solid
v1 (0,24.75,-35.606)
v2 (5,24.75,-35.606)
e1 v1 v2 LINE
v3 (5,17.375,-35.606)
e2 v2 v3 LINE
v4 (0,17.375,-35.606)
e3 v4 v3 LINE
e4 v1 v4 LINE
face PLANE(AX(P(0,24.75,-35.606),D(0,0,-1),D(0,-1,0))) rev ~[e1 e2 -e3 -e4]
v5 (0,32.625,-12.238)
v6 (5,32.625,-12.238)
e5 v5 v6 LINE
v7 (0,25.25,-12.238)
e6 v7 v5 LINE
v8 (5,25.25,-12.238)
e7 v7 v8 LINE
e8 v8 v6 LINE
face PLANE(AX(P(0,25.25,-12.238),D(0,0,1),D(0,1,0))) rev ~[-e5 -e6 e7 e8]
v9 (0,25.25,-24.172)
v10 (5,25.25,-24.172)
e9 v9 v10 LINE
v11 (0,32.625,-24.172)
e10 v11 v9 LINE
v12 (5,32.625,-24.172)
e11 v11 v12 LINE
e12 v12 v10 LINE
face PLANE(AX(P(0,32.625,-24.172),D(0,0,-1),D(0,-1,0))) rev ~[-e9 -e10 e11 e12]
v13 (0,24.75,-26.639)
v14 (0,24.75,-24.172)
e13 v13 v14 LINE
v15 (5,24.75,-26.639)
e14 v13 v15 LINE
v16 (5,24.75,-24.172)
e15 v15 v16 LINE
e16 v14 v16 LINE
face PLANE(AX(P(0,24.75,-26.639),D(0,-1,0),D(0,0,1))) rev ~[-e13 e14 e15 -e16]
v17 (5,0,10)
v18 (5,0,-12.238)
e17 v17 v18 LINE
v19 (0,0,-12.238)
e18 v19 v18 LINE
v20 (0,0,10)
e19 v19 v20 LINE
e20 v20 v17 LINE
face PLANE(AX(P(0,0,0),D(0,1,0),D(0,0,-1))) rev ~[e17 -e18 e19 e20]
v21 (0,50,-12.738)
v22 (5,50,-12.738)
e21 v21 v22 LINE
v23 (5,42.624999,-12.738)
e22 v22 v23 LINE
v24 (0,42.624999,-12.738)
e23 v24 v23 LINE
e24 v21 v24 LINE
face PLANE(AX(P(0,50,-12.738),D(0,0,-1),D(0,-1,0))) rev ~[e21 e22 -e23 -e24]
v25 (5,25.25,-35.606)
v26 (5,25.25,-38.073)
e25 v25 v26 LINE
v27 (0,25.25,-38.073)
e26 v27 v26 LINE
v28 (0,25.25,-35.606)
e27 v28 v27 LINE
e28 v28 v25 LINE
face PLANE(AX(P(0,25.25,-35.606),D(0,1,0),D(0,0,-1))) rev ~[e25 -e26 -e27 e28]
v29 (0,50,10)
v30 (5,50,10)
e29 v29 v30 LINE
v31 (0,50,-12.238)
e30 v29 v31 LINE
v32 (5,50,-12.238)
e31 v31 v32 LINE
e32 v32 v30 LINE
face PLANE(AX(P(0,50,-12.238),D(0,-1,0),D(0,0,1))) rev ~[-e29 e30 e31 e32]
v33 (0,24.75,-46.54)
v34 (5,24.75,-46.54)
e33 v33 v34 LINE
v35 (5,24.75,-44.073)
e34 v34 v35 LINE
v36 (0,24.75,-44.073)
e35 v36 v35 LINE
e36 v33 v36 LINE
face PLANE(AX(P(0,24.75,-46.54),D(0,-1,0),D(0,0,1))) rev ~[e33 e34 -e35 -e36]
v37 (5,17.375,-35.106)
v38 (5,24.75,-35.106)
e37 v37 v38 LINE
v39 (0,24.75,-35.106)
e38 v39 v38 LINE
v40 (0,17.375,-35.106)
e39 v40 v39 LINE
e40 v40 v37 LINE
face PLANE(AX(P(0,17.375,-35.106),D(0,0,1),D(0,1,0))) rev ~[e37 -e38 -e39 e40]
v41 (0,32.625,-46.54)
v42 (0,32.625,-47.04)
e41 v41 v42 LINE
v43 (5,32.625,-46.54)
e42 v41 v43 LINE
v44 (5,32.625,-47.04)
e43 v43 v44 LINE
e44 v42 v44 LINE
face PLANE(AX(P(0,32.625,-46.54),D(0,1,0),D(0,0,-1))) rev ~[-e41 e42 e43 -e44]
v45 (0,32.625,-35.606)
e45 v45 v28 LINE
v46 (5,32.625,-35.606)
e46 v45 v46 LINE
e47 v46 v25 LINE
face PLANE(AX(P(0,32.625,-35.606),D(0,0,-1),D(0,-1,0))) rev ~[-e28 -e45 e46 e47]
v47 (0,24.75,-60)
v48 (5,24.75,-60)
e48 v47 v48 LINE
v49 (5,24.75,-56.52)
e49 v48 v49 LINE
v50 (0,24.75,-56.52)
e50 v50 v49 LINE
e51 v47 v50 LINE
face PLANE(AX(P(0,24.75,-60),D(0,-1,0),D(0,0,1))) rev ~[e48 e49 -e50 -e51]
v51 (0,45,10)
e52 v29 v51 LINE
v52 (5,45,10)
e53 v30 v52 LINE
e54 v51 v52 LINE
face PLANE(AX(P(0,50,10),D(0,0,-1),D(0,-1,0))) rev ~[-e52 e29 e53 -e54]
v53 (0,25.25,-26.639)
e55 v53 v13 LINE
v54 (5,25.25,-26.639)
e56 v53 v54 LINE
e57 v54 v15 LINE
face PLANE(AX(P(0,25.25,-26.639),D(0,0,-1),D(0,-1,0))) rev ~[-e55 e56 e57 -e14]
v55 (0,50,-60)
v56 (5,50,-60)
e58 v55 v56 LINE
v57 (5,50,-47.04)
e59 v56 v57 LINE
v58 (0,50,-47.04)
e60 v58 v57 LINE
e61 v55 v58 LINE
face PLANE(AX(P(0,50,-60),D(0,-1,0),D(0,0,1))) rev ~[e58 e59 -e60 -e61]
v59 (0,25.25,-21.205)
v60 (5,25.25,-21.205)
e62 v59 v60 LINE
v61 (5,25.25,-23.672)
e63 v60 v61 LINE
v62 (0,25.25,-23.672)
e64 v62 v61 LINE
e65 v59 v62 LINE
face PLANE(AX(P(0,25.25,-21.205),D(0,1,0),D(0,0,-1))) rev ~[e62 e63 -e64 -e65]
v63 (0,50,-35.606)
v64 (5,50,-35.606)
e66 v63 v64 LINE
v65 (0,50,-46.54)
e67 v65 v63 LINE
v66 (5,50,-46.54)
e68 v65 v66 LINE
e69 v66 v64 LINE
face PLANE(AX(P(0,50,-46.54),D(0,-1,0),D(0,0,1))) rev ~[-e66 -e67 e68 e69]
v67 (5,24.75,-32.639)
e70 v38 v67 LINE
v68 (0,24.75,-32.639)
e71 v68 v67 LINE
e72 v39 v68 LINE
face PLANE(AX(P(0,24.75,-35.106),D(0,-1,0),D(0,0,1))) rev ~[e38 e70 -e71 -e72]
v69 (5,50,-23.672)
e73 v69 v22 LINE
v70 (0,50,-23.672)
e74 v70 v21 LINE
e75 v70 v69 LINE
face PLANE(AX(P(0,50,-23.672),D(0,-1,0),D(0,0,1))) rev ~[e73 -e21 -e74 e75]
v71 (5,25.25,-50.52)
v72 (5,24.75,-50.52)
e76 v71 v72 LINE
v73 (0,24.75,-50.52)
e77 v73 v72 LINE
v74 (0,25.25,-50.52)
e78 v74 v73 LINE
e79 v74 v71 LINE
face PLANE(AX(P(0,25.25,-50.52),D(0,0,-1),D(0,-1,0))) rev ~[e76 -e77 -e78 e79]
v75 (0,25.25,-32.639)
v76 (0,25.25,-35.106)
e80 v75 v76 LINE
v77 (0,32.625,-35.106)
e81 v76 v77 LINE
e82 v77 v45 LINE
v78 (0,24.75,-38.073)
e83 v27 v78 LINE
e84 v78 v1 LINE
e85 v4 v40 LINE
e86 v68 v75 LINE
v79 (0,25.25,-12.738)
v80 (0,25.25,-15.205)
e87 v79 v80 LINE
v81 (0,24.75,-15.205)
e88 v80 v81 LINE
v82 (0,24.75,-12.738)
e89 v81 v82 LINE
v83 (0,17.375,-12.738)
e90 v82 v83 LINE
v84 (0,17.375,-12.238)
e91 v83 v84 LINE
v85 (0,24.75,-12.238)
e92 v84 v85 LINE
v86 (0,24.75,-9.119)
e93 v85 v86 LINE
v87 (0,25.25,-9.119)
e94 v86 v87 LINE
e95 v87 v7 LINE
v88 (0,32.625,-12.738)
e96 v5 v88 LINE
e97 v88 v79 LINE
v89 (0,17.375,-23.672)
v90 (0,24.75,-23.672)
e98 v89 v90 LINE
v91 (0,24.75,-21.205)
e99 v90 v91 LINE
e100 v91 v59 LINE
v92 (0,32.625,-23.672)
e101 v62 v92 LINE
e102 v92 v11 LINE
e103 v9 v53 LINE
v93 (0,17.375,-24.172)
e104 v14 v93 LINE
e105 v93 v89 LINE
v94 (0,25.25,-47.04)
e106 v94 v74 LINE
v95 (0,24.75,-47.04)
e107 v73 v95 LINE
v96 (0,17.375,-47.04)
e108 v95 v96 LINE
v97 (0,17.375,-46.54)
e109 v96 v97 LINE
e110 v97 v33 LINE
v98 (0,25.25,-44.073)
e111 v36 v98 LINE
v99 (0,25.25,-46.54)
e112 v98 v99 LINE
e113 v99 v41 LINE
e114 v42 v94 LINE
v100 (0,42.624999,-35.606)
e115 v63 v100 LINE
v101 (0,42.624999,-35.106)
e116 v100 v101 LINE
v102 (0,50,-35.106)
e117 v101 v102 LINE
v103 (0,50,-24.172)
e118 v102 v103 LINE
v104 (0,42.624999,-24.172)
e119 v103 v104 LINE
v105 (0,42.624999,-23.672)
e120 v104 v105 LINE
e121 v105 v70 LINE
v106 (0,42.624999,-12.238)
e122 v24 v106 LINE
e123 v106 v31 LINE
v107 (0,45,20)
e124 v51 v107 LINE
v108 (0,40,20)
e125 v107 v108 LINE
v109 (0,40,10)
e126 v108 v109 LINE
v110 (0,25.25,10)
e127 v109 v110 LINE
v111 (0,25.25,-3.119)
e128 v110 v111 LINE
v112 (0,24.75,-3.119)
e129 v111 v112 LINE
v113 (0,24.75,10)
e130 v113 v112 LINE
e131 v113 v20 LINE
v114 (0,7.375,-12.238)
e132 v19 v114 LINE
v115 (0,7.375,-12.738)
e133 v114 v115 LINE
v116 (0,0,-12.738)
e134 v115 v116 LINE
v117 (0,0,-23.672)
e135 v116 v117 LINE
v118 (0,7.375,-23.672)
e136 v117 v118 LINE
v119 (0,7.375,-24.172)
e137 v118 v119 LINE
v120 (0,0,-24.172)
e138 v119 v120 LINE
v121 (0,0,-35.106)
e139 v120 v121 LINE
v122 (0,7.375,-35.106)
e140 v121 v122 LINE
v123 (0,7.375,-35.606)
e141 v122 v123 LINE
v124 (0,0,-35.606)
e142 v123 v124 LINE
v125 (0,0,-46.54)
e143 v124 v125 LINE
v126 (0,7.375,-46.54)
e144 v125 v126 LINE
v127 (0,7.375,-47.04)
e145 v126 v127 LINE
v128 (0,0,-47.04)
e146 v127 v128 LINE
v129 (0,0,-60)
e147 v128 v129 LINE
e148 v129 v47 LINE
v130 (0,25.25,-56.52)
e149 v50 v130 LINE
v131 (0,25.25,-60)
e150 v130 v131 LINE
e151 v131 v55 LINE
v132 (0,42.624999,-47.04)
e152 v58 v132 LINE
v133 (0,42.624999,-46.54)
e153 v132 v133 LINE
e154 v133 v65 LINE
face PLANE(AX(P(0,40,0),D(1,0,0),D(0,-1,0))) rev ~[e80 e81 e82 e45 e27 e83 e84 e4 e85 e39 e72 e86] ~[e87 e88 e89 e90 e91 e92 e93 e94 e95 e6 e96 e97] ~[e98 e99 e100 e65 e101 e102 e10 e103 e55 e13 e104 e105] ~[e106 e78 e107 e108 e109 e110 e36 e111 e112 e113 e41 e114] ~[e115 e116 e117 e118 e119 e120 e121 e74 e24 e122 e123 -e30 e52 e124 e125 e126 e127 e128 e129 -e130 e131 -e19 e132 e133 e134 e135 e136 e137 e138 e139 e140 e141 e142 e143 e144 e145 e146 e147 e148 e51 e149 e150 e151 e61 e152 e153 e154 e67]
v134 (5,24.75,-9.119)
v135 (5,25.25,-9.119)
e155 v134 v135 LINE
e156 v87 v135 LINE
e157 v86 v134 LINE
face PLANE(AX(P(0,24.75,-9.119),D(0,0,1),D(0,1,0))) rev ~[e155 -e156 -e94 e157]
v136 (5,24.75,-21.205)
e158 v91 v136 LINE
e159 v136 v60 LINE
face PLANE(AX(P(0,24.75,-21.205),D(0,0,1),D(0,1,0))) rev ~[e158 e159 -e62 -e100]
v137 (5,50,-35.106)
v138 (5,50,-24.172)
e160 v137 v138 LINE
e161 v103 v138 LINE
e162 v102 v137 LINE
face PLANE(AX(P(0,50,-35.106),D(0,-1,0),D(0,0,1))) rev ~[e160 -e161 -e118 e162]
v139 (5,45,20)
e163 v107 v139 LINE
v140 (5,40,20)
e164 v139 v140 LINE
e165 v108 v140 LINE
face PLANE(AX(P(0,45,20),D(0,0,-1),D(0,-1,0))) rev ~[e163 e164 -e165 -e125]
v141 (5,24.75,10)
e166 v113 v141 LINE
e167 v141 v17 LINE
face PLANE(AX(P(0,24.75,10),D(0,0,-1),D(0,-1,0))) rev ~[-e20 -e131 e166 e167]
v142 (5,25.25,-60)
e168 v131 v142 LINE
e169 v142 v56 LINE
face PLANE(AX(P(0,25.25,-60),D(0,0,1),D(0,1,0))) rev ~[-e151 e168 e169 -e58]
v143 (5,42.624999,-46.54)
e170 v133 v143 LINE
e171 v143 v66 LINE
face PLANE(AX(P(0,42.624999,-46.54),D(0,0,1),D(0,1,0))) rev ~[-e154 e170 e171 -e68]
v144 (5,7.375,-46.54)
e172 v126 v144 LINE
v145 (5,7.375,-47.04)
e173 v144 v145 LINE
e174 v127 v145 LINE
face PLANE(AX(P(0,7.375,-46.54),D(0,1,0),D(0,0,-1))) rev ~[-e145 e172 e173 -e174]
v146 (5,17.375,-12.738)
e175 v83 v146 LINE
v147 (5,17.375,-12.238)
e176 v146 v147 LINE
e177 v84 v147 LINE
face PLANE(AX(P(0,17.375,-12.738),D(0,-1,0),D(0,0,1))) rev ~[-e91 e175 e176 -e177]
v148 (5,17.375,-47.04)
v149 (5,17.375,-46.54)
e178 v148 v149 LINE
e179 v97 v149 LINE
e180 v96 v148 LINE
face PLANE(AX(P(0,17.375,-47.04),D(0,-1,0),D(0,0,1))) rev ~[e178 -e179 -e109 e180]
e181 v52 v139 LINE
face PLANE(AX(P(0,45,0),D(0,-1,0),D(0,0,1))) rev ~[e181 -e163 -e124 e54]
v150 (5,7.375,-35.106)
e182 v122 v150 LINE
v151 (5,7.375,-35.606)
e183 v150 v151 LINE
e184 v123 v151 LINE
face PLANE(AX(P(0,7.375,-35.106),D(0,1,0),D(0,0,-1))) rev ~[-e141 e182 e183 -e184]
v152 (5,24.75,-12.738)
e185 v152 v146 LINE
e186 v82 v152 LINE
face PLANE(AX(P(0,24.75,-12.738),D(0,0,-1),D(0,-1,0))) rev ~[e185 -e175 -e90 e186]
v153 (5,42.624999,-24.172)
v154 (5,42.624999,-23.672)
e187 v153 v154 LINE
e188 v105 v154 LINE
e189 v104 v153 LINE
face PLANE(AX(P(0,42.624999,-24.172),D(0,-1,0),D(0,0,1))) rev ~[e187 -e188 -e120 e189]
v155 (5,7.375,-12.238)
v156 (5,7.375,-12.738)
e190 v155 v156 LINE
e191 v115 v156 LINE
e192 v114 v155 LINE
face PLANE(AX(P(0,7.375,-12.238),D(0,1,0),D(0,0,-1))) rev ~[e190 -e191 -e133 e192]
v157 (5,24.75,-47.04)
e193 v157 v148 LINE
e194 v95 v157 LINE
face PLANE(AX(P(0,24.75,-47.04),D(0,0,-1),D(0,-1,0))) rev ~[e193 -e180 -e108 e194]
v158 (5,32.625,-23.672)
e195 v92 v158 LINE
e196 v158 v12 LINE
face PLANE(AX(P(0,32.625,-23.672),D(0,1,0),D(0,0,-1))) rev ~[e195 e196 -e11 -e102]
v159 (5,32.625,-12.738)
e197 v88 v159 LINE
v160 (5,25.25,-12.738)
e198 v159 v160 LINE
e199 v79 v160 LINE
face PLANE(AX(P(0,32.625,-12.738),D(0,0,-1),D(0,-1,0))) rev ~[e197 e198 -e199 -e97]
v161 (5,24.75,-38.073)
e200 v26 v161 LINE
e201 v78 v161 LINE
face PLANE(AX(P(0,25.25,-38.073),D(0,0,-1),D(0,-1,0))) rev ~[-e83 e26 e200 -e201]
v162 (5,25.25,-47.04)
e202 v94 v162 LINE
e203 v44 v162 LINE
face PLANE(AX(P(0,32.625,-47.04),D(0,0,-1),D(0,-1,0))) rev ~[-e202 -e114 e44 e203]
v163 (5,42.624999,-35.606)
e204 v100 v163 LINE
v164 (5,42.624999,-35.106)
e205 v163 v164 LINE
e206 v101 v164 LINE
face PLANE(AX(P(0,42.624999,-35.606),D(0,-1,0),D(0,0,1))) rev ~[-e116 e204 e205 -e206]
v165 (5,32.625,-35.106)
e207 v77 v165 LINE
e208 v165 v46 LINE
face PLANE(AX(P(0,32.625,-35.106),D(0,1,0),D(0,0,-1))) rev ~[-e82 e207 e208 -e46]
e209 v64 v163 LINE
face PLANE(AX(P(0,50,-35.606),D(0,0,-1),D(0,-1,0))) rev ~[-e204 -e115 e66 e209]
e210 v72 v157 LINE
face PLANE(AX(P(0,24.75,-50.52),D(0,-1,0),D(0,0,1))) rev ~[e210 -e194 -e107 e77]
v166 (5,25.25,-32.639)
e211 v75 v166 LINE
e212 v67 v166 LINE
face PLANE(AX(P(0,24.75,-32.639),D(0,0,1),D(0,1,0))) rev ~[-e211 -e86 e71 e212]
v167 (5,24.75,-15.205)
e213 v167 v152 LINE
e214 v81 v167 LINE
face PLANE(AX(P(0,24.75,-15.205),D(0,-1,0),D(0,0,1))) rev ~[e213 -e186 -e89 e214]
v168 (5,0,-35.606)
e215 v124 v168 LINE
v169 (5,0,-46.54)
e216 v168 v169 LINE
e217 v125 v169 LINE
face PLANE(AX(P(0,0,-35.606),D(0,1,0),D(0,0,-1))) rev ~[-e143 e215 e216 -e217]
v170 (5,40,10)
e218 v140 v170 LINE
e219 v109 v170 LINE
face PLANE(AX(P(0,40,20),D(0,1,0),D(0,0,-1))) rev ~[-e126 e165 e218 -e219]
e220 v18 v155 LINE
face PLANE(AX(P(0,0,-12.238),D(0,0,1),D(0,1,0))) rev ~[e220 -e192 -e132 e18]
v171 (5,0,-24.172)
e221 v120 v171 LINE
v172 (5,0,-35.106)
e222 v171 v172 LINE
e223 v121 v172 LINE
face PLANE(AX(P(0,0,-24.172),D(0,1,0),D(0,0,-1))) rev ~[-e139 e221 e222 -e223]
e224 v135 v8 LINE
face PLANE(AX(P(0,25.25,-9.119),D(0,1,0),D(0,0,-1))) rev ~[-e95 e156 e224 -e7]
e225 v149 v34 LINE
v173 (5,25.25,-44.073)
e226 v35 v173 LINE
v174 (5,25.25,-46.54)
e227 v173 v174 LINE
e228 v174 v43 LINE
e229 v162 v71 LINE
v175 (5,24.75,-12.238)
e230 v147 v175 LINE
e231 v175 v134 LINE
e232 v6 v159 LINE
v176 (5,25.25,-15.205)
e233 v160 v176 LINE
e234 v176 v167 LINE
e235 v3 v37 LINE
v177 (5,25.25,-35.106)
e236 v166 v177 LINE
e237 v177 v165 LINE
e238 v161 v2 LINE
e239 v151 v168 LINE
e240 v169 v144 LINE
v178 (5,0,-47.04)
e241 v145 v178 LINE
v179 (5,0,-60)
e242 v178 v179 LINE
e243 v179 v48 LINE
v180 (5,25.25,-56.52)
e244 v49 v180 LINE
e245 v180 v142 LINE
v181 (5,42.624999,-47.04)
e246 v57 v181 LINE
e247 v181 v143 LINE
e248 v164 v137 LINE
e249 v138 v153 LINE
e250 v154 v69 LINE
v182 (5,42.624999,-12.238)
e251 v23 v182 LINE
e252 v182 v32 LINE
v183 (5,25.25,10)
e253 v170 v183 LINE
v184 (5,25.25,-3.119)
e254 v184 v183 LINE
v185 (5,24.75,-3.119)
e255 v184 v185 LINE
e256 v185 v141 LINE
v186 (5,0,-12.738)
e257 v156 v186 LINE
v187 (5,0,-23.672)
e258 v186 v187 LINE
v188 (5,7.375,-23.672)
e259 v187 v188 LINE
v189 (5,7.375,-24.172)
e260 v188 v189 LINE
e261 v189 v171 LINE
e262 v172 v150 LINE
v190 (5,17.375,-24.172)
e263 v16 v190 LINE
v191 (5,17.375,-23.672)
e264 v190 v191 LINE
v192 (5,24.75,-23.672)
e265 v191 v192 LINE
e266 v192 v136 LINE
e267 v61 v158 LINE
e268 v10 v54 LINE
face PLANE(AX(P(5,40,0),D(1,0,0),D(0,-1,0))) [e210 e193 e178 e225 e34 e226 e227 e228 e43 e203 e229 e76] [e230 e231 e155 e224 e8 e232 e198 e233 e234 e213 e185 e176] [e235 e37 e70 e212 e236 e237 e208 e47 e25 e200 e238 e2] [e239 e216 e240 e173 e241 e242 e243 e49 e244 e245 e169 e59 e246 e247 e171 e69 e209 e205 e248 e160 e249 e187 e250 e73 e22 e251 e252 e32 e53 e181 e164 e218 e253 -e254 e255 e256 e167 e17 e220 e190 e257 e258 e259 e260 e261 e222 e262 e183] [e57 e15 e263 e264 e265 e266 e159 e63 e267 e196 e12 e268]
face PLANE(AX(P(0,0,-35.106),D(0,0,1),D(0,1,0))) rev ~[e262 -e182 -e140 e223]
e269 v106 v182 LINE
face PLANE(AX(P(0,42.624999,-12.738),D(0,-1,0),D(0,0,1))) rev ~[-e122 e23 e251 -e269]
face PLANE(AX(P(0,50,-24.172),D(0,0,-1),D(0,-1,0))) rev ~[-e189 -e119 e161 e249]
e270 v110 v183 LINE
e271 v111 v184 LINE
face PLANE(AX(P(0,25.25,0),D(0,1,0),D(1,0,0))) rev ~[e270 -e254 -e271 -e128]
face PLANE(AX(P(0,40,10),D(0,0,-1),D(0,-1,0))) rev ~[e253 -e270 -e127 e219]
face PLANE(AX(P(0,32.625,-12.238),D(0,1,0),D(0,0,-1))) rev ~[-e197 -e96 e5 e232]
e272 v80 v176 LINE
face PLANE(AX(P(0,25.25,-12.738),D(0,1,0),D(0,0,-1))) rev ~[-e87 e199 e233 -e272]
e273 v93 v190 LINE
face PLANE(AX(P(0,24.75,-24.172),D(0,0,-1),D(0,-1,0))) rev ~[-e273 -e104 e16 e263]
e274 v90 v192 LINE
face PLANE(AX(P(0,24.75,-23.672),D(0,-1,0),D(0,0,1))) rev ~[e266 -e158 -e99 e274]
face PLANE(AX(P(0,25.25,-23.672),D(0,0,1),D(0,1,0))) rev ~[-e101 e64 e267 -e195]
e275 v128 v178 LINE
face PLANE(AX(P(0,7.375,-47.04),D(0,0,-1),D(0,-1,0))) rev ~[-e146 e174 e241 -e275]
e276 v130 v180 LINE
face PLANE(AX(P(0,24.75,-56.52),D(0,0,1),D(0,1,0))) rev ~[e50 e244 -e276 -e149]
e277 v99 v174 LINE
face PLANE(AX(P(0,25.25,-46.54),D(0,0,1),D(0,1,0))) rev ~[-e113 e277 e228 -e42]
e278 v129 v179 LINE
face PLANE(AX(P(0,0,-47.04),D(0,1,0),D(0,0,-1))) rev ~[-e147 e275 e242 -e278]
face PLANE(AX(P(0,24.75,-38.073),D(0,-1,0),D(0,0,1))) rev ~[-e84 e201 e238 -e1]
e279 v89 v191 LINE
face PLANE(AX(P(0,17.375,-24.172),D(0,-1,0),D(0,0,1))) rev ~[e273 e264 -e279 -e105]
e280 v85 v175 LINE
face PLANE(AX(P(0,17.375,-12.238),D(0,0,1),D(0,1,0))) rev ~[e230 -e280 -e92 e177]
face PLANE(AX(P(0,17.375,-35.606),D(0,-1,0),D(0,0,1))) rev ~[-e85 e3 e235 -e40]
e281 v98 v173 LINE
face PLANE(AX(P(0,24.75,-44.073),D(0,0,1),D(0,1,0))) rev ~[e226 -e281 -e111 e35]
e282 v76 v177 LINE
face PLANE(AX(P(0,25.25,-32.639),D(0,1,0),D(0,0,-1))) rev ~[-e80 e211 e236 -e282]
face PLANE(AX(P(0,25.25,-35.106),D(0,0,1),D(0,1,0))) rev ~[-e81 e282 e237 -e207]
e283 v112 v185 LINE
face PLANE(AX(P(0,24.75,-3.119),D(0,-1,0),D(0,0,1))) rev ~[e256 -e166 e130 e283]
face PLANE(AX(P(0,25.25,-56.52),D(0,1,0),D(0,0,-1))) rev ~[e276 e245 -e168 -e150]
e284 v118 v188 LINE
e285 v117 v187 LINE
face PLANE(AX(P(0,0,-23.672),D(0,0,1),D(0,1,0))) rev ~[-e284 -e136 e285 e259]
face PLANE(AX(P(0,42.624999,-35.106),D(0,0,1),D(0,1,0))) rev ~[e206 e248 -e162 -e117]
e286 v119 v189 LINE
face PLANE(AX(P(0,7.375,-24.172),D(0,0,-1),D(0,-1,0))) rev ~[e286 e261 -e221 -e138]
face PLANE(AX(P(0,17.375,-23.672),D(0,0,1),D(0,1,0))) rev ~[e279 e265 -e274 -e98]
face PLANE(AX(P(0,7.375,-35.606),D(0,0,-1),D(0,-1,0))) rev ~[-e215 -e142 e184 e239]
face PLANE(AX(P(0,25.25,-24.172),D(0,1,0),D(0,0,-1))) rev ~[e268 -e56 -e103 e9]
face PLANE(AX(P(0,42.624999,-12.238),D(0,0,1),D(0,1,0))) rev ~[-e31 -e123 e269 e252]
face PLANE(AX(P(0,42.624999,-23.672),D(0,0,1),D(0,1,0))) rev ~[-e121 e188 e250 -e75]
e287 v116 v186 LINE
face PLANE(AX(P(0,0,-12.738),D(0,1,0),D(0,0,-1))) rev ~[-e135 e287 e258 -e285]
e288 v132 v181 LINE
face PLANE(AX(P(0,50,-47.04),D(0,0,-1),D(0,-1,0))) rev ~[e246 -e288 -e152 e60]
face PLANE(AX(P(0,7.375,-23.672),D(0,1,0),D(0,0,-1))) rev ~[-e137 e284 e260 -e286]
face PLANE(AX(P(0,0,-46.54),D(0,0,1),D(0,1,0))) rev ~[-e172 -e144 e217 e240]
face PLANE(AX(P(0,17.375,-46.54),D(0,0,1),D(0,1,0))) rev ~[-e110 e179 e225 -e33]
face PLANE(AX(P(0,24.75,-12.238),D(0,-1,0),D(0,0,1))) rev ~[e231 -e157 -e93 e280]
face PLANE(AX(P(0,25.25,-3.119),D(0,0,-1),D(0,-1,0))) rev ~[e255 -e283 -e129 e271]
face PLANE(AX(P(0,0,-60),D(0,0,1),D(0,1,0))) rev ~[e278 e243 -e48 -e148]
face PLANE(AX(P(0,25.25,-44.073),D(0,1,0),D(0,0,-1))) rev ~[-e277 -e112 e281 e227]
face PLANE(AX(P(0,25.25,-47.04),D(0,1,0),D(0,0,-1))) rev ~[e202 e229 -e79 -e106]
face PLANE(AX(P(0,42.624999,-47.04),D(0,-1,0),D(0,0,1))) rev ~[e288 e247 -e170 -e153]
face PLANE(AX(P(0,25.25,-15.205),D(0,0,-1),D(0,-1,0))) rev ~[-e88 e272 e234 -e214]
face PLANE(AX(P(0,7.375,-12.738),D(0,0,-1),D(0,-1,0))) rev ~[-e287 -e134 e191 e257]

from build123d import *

# Parameters (mm, degrees)
F1_DEPTH = 5
F2_DEPTH = 10


# Not quite as in the source:
# - a feature names something its author has since deleted; it is built from what else it names


with BuildPart() as f1:
    # F0 (on Right) → F1 (new body)
    with BuildSketch(Plane.YZ):
        Polygon((11.5, 0), (0, 0), (0, -12.238), (7.3750000447, -12.238), (7.3750000447, -12.738), (0, -12.738), (0, -23.672), (7.3750000447, -23.672), (7.3750000447, -24.172), (0, -24.172), (0, -35.106), (7.3750000447, -35.106), (7.3750000447, -35.606), (0, -35.606), (0, -46.54), (7.3750000447, -46.54), (7.3750000447, -47.04), (0, -47.04), (0, -60), (24.75, -60), (24.75, -56.52), (25.25, -56.52), (25.25, -60), (50, -60), (50, -47.04), (42.6249988377, -47.04), (42.6249988377, -46.54), (50, -46.54), (50, -35.606), (42.6249988377, -35.606), (42.6249988377, -35.106), (50, -35.106), (50, -24.172), (42.6249988377, -24.172), (42.6249988377, -23.672), (50, -23.672), (50, -12.738), (42.6249988377, -12.738), (42.6249988377, -12.238), (50, -12.238), (50, 0), (45, 0), (45, 15), (45, 19.999999553), (40, 19.999999553), (40, 15), (40, 0), (37.625, 0), (35.125, 0), (25.25, 0), (25.25, -1.304), (25.25, -3.119), (24.75, -3.119), (24.75, 0), (14.875, 0), (12.375, 0), align=None)
        Polygon((25.25, -44.073), (25.25, -46.54), (32.625, -46.54), (32.625, -47.04), (25.25, -47.04), (25.25, -50.52), (24.75, -50.52), (24.75, -47.04), (17.375, -47.04), (17.375, -46.54), (24.75, -46.54), (24.75, -44.073), align=None, mode=Mode.SUBTRACT)
        Polygon((25.25, -32.639), (25.25, -35.106), (32.625, -35.106), (32.625, -35.606), (25.25, -35.606), (25.25, -38.073), (24.75, -38.073), (24.75, -35.606), (17.375, -35.606), (17.375, -35.106), (24.75, -35.106), (24.75, -32.639), align=None, mode=Mode.SUBTRACT)
        Polygon((25.25, -21.205), (25.25, -23.672), (32.625, -23.672), (32.625, -24.172), (25.25, -24.172), (25.25, -26.639), (24.75, -26.639), (24.75, -24.172), (17.375, -24.172), (17.375, -23.672), (24.75, -23.672), (24.75, -21.205), align=None, mode=Mode.SUBTRACT)
        Polygon((25.25, -9.119), (25.25, -12.238), (32.625, -12.238), (32.625, -12.738), (25.25, -12.738), (25.25, -15.205), (24.75, -15.205), (24.75, -12.738), (17.375, -12.738), (17.375, -12.238), (24.75, -12.238), (24.75, -9.119), align=None, mode=Mode.SUBTRACT)
    extrude(amount=F1_DEPTH)

    # F2 (add): faces of the model
    f2_faces = [f1.faces().sort_by_distance(p)[0] for p in [
        (2.5, 32.625, 0),
        (2.5, 12.375, 0),
        (2.5, 47.5, 0),
    ]]
    extrude(f2_faces, amount=F2_DEPTH)


solid = f1.part
